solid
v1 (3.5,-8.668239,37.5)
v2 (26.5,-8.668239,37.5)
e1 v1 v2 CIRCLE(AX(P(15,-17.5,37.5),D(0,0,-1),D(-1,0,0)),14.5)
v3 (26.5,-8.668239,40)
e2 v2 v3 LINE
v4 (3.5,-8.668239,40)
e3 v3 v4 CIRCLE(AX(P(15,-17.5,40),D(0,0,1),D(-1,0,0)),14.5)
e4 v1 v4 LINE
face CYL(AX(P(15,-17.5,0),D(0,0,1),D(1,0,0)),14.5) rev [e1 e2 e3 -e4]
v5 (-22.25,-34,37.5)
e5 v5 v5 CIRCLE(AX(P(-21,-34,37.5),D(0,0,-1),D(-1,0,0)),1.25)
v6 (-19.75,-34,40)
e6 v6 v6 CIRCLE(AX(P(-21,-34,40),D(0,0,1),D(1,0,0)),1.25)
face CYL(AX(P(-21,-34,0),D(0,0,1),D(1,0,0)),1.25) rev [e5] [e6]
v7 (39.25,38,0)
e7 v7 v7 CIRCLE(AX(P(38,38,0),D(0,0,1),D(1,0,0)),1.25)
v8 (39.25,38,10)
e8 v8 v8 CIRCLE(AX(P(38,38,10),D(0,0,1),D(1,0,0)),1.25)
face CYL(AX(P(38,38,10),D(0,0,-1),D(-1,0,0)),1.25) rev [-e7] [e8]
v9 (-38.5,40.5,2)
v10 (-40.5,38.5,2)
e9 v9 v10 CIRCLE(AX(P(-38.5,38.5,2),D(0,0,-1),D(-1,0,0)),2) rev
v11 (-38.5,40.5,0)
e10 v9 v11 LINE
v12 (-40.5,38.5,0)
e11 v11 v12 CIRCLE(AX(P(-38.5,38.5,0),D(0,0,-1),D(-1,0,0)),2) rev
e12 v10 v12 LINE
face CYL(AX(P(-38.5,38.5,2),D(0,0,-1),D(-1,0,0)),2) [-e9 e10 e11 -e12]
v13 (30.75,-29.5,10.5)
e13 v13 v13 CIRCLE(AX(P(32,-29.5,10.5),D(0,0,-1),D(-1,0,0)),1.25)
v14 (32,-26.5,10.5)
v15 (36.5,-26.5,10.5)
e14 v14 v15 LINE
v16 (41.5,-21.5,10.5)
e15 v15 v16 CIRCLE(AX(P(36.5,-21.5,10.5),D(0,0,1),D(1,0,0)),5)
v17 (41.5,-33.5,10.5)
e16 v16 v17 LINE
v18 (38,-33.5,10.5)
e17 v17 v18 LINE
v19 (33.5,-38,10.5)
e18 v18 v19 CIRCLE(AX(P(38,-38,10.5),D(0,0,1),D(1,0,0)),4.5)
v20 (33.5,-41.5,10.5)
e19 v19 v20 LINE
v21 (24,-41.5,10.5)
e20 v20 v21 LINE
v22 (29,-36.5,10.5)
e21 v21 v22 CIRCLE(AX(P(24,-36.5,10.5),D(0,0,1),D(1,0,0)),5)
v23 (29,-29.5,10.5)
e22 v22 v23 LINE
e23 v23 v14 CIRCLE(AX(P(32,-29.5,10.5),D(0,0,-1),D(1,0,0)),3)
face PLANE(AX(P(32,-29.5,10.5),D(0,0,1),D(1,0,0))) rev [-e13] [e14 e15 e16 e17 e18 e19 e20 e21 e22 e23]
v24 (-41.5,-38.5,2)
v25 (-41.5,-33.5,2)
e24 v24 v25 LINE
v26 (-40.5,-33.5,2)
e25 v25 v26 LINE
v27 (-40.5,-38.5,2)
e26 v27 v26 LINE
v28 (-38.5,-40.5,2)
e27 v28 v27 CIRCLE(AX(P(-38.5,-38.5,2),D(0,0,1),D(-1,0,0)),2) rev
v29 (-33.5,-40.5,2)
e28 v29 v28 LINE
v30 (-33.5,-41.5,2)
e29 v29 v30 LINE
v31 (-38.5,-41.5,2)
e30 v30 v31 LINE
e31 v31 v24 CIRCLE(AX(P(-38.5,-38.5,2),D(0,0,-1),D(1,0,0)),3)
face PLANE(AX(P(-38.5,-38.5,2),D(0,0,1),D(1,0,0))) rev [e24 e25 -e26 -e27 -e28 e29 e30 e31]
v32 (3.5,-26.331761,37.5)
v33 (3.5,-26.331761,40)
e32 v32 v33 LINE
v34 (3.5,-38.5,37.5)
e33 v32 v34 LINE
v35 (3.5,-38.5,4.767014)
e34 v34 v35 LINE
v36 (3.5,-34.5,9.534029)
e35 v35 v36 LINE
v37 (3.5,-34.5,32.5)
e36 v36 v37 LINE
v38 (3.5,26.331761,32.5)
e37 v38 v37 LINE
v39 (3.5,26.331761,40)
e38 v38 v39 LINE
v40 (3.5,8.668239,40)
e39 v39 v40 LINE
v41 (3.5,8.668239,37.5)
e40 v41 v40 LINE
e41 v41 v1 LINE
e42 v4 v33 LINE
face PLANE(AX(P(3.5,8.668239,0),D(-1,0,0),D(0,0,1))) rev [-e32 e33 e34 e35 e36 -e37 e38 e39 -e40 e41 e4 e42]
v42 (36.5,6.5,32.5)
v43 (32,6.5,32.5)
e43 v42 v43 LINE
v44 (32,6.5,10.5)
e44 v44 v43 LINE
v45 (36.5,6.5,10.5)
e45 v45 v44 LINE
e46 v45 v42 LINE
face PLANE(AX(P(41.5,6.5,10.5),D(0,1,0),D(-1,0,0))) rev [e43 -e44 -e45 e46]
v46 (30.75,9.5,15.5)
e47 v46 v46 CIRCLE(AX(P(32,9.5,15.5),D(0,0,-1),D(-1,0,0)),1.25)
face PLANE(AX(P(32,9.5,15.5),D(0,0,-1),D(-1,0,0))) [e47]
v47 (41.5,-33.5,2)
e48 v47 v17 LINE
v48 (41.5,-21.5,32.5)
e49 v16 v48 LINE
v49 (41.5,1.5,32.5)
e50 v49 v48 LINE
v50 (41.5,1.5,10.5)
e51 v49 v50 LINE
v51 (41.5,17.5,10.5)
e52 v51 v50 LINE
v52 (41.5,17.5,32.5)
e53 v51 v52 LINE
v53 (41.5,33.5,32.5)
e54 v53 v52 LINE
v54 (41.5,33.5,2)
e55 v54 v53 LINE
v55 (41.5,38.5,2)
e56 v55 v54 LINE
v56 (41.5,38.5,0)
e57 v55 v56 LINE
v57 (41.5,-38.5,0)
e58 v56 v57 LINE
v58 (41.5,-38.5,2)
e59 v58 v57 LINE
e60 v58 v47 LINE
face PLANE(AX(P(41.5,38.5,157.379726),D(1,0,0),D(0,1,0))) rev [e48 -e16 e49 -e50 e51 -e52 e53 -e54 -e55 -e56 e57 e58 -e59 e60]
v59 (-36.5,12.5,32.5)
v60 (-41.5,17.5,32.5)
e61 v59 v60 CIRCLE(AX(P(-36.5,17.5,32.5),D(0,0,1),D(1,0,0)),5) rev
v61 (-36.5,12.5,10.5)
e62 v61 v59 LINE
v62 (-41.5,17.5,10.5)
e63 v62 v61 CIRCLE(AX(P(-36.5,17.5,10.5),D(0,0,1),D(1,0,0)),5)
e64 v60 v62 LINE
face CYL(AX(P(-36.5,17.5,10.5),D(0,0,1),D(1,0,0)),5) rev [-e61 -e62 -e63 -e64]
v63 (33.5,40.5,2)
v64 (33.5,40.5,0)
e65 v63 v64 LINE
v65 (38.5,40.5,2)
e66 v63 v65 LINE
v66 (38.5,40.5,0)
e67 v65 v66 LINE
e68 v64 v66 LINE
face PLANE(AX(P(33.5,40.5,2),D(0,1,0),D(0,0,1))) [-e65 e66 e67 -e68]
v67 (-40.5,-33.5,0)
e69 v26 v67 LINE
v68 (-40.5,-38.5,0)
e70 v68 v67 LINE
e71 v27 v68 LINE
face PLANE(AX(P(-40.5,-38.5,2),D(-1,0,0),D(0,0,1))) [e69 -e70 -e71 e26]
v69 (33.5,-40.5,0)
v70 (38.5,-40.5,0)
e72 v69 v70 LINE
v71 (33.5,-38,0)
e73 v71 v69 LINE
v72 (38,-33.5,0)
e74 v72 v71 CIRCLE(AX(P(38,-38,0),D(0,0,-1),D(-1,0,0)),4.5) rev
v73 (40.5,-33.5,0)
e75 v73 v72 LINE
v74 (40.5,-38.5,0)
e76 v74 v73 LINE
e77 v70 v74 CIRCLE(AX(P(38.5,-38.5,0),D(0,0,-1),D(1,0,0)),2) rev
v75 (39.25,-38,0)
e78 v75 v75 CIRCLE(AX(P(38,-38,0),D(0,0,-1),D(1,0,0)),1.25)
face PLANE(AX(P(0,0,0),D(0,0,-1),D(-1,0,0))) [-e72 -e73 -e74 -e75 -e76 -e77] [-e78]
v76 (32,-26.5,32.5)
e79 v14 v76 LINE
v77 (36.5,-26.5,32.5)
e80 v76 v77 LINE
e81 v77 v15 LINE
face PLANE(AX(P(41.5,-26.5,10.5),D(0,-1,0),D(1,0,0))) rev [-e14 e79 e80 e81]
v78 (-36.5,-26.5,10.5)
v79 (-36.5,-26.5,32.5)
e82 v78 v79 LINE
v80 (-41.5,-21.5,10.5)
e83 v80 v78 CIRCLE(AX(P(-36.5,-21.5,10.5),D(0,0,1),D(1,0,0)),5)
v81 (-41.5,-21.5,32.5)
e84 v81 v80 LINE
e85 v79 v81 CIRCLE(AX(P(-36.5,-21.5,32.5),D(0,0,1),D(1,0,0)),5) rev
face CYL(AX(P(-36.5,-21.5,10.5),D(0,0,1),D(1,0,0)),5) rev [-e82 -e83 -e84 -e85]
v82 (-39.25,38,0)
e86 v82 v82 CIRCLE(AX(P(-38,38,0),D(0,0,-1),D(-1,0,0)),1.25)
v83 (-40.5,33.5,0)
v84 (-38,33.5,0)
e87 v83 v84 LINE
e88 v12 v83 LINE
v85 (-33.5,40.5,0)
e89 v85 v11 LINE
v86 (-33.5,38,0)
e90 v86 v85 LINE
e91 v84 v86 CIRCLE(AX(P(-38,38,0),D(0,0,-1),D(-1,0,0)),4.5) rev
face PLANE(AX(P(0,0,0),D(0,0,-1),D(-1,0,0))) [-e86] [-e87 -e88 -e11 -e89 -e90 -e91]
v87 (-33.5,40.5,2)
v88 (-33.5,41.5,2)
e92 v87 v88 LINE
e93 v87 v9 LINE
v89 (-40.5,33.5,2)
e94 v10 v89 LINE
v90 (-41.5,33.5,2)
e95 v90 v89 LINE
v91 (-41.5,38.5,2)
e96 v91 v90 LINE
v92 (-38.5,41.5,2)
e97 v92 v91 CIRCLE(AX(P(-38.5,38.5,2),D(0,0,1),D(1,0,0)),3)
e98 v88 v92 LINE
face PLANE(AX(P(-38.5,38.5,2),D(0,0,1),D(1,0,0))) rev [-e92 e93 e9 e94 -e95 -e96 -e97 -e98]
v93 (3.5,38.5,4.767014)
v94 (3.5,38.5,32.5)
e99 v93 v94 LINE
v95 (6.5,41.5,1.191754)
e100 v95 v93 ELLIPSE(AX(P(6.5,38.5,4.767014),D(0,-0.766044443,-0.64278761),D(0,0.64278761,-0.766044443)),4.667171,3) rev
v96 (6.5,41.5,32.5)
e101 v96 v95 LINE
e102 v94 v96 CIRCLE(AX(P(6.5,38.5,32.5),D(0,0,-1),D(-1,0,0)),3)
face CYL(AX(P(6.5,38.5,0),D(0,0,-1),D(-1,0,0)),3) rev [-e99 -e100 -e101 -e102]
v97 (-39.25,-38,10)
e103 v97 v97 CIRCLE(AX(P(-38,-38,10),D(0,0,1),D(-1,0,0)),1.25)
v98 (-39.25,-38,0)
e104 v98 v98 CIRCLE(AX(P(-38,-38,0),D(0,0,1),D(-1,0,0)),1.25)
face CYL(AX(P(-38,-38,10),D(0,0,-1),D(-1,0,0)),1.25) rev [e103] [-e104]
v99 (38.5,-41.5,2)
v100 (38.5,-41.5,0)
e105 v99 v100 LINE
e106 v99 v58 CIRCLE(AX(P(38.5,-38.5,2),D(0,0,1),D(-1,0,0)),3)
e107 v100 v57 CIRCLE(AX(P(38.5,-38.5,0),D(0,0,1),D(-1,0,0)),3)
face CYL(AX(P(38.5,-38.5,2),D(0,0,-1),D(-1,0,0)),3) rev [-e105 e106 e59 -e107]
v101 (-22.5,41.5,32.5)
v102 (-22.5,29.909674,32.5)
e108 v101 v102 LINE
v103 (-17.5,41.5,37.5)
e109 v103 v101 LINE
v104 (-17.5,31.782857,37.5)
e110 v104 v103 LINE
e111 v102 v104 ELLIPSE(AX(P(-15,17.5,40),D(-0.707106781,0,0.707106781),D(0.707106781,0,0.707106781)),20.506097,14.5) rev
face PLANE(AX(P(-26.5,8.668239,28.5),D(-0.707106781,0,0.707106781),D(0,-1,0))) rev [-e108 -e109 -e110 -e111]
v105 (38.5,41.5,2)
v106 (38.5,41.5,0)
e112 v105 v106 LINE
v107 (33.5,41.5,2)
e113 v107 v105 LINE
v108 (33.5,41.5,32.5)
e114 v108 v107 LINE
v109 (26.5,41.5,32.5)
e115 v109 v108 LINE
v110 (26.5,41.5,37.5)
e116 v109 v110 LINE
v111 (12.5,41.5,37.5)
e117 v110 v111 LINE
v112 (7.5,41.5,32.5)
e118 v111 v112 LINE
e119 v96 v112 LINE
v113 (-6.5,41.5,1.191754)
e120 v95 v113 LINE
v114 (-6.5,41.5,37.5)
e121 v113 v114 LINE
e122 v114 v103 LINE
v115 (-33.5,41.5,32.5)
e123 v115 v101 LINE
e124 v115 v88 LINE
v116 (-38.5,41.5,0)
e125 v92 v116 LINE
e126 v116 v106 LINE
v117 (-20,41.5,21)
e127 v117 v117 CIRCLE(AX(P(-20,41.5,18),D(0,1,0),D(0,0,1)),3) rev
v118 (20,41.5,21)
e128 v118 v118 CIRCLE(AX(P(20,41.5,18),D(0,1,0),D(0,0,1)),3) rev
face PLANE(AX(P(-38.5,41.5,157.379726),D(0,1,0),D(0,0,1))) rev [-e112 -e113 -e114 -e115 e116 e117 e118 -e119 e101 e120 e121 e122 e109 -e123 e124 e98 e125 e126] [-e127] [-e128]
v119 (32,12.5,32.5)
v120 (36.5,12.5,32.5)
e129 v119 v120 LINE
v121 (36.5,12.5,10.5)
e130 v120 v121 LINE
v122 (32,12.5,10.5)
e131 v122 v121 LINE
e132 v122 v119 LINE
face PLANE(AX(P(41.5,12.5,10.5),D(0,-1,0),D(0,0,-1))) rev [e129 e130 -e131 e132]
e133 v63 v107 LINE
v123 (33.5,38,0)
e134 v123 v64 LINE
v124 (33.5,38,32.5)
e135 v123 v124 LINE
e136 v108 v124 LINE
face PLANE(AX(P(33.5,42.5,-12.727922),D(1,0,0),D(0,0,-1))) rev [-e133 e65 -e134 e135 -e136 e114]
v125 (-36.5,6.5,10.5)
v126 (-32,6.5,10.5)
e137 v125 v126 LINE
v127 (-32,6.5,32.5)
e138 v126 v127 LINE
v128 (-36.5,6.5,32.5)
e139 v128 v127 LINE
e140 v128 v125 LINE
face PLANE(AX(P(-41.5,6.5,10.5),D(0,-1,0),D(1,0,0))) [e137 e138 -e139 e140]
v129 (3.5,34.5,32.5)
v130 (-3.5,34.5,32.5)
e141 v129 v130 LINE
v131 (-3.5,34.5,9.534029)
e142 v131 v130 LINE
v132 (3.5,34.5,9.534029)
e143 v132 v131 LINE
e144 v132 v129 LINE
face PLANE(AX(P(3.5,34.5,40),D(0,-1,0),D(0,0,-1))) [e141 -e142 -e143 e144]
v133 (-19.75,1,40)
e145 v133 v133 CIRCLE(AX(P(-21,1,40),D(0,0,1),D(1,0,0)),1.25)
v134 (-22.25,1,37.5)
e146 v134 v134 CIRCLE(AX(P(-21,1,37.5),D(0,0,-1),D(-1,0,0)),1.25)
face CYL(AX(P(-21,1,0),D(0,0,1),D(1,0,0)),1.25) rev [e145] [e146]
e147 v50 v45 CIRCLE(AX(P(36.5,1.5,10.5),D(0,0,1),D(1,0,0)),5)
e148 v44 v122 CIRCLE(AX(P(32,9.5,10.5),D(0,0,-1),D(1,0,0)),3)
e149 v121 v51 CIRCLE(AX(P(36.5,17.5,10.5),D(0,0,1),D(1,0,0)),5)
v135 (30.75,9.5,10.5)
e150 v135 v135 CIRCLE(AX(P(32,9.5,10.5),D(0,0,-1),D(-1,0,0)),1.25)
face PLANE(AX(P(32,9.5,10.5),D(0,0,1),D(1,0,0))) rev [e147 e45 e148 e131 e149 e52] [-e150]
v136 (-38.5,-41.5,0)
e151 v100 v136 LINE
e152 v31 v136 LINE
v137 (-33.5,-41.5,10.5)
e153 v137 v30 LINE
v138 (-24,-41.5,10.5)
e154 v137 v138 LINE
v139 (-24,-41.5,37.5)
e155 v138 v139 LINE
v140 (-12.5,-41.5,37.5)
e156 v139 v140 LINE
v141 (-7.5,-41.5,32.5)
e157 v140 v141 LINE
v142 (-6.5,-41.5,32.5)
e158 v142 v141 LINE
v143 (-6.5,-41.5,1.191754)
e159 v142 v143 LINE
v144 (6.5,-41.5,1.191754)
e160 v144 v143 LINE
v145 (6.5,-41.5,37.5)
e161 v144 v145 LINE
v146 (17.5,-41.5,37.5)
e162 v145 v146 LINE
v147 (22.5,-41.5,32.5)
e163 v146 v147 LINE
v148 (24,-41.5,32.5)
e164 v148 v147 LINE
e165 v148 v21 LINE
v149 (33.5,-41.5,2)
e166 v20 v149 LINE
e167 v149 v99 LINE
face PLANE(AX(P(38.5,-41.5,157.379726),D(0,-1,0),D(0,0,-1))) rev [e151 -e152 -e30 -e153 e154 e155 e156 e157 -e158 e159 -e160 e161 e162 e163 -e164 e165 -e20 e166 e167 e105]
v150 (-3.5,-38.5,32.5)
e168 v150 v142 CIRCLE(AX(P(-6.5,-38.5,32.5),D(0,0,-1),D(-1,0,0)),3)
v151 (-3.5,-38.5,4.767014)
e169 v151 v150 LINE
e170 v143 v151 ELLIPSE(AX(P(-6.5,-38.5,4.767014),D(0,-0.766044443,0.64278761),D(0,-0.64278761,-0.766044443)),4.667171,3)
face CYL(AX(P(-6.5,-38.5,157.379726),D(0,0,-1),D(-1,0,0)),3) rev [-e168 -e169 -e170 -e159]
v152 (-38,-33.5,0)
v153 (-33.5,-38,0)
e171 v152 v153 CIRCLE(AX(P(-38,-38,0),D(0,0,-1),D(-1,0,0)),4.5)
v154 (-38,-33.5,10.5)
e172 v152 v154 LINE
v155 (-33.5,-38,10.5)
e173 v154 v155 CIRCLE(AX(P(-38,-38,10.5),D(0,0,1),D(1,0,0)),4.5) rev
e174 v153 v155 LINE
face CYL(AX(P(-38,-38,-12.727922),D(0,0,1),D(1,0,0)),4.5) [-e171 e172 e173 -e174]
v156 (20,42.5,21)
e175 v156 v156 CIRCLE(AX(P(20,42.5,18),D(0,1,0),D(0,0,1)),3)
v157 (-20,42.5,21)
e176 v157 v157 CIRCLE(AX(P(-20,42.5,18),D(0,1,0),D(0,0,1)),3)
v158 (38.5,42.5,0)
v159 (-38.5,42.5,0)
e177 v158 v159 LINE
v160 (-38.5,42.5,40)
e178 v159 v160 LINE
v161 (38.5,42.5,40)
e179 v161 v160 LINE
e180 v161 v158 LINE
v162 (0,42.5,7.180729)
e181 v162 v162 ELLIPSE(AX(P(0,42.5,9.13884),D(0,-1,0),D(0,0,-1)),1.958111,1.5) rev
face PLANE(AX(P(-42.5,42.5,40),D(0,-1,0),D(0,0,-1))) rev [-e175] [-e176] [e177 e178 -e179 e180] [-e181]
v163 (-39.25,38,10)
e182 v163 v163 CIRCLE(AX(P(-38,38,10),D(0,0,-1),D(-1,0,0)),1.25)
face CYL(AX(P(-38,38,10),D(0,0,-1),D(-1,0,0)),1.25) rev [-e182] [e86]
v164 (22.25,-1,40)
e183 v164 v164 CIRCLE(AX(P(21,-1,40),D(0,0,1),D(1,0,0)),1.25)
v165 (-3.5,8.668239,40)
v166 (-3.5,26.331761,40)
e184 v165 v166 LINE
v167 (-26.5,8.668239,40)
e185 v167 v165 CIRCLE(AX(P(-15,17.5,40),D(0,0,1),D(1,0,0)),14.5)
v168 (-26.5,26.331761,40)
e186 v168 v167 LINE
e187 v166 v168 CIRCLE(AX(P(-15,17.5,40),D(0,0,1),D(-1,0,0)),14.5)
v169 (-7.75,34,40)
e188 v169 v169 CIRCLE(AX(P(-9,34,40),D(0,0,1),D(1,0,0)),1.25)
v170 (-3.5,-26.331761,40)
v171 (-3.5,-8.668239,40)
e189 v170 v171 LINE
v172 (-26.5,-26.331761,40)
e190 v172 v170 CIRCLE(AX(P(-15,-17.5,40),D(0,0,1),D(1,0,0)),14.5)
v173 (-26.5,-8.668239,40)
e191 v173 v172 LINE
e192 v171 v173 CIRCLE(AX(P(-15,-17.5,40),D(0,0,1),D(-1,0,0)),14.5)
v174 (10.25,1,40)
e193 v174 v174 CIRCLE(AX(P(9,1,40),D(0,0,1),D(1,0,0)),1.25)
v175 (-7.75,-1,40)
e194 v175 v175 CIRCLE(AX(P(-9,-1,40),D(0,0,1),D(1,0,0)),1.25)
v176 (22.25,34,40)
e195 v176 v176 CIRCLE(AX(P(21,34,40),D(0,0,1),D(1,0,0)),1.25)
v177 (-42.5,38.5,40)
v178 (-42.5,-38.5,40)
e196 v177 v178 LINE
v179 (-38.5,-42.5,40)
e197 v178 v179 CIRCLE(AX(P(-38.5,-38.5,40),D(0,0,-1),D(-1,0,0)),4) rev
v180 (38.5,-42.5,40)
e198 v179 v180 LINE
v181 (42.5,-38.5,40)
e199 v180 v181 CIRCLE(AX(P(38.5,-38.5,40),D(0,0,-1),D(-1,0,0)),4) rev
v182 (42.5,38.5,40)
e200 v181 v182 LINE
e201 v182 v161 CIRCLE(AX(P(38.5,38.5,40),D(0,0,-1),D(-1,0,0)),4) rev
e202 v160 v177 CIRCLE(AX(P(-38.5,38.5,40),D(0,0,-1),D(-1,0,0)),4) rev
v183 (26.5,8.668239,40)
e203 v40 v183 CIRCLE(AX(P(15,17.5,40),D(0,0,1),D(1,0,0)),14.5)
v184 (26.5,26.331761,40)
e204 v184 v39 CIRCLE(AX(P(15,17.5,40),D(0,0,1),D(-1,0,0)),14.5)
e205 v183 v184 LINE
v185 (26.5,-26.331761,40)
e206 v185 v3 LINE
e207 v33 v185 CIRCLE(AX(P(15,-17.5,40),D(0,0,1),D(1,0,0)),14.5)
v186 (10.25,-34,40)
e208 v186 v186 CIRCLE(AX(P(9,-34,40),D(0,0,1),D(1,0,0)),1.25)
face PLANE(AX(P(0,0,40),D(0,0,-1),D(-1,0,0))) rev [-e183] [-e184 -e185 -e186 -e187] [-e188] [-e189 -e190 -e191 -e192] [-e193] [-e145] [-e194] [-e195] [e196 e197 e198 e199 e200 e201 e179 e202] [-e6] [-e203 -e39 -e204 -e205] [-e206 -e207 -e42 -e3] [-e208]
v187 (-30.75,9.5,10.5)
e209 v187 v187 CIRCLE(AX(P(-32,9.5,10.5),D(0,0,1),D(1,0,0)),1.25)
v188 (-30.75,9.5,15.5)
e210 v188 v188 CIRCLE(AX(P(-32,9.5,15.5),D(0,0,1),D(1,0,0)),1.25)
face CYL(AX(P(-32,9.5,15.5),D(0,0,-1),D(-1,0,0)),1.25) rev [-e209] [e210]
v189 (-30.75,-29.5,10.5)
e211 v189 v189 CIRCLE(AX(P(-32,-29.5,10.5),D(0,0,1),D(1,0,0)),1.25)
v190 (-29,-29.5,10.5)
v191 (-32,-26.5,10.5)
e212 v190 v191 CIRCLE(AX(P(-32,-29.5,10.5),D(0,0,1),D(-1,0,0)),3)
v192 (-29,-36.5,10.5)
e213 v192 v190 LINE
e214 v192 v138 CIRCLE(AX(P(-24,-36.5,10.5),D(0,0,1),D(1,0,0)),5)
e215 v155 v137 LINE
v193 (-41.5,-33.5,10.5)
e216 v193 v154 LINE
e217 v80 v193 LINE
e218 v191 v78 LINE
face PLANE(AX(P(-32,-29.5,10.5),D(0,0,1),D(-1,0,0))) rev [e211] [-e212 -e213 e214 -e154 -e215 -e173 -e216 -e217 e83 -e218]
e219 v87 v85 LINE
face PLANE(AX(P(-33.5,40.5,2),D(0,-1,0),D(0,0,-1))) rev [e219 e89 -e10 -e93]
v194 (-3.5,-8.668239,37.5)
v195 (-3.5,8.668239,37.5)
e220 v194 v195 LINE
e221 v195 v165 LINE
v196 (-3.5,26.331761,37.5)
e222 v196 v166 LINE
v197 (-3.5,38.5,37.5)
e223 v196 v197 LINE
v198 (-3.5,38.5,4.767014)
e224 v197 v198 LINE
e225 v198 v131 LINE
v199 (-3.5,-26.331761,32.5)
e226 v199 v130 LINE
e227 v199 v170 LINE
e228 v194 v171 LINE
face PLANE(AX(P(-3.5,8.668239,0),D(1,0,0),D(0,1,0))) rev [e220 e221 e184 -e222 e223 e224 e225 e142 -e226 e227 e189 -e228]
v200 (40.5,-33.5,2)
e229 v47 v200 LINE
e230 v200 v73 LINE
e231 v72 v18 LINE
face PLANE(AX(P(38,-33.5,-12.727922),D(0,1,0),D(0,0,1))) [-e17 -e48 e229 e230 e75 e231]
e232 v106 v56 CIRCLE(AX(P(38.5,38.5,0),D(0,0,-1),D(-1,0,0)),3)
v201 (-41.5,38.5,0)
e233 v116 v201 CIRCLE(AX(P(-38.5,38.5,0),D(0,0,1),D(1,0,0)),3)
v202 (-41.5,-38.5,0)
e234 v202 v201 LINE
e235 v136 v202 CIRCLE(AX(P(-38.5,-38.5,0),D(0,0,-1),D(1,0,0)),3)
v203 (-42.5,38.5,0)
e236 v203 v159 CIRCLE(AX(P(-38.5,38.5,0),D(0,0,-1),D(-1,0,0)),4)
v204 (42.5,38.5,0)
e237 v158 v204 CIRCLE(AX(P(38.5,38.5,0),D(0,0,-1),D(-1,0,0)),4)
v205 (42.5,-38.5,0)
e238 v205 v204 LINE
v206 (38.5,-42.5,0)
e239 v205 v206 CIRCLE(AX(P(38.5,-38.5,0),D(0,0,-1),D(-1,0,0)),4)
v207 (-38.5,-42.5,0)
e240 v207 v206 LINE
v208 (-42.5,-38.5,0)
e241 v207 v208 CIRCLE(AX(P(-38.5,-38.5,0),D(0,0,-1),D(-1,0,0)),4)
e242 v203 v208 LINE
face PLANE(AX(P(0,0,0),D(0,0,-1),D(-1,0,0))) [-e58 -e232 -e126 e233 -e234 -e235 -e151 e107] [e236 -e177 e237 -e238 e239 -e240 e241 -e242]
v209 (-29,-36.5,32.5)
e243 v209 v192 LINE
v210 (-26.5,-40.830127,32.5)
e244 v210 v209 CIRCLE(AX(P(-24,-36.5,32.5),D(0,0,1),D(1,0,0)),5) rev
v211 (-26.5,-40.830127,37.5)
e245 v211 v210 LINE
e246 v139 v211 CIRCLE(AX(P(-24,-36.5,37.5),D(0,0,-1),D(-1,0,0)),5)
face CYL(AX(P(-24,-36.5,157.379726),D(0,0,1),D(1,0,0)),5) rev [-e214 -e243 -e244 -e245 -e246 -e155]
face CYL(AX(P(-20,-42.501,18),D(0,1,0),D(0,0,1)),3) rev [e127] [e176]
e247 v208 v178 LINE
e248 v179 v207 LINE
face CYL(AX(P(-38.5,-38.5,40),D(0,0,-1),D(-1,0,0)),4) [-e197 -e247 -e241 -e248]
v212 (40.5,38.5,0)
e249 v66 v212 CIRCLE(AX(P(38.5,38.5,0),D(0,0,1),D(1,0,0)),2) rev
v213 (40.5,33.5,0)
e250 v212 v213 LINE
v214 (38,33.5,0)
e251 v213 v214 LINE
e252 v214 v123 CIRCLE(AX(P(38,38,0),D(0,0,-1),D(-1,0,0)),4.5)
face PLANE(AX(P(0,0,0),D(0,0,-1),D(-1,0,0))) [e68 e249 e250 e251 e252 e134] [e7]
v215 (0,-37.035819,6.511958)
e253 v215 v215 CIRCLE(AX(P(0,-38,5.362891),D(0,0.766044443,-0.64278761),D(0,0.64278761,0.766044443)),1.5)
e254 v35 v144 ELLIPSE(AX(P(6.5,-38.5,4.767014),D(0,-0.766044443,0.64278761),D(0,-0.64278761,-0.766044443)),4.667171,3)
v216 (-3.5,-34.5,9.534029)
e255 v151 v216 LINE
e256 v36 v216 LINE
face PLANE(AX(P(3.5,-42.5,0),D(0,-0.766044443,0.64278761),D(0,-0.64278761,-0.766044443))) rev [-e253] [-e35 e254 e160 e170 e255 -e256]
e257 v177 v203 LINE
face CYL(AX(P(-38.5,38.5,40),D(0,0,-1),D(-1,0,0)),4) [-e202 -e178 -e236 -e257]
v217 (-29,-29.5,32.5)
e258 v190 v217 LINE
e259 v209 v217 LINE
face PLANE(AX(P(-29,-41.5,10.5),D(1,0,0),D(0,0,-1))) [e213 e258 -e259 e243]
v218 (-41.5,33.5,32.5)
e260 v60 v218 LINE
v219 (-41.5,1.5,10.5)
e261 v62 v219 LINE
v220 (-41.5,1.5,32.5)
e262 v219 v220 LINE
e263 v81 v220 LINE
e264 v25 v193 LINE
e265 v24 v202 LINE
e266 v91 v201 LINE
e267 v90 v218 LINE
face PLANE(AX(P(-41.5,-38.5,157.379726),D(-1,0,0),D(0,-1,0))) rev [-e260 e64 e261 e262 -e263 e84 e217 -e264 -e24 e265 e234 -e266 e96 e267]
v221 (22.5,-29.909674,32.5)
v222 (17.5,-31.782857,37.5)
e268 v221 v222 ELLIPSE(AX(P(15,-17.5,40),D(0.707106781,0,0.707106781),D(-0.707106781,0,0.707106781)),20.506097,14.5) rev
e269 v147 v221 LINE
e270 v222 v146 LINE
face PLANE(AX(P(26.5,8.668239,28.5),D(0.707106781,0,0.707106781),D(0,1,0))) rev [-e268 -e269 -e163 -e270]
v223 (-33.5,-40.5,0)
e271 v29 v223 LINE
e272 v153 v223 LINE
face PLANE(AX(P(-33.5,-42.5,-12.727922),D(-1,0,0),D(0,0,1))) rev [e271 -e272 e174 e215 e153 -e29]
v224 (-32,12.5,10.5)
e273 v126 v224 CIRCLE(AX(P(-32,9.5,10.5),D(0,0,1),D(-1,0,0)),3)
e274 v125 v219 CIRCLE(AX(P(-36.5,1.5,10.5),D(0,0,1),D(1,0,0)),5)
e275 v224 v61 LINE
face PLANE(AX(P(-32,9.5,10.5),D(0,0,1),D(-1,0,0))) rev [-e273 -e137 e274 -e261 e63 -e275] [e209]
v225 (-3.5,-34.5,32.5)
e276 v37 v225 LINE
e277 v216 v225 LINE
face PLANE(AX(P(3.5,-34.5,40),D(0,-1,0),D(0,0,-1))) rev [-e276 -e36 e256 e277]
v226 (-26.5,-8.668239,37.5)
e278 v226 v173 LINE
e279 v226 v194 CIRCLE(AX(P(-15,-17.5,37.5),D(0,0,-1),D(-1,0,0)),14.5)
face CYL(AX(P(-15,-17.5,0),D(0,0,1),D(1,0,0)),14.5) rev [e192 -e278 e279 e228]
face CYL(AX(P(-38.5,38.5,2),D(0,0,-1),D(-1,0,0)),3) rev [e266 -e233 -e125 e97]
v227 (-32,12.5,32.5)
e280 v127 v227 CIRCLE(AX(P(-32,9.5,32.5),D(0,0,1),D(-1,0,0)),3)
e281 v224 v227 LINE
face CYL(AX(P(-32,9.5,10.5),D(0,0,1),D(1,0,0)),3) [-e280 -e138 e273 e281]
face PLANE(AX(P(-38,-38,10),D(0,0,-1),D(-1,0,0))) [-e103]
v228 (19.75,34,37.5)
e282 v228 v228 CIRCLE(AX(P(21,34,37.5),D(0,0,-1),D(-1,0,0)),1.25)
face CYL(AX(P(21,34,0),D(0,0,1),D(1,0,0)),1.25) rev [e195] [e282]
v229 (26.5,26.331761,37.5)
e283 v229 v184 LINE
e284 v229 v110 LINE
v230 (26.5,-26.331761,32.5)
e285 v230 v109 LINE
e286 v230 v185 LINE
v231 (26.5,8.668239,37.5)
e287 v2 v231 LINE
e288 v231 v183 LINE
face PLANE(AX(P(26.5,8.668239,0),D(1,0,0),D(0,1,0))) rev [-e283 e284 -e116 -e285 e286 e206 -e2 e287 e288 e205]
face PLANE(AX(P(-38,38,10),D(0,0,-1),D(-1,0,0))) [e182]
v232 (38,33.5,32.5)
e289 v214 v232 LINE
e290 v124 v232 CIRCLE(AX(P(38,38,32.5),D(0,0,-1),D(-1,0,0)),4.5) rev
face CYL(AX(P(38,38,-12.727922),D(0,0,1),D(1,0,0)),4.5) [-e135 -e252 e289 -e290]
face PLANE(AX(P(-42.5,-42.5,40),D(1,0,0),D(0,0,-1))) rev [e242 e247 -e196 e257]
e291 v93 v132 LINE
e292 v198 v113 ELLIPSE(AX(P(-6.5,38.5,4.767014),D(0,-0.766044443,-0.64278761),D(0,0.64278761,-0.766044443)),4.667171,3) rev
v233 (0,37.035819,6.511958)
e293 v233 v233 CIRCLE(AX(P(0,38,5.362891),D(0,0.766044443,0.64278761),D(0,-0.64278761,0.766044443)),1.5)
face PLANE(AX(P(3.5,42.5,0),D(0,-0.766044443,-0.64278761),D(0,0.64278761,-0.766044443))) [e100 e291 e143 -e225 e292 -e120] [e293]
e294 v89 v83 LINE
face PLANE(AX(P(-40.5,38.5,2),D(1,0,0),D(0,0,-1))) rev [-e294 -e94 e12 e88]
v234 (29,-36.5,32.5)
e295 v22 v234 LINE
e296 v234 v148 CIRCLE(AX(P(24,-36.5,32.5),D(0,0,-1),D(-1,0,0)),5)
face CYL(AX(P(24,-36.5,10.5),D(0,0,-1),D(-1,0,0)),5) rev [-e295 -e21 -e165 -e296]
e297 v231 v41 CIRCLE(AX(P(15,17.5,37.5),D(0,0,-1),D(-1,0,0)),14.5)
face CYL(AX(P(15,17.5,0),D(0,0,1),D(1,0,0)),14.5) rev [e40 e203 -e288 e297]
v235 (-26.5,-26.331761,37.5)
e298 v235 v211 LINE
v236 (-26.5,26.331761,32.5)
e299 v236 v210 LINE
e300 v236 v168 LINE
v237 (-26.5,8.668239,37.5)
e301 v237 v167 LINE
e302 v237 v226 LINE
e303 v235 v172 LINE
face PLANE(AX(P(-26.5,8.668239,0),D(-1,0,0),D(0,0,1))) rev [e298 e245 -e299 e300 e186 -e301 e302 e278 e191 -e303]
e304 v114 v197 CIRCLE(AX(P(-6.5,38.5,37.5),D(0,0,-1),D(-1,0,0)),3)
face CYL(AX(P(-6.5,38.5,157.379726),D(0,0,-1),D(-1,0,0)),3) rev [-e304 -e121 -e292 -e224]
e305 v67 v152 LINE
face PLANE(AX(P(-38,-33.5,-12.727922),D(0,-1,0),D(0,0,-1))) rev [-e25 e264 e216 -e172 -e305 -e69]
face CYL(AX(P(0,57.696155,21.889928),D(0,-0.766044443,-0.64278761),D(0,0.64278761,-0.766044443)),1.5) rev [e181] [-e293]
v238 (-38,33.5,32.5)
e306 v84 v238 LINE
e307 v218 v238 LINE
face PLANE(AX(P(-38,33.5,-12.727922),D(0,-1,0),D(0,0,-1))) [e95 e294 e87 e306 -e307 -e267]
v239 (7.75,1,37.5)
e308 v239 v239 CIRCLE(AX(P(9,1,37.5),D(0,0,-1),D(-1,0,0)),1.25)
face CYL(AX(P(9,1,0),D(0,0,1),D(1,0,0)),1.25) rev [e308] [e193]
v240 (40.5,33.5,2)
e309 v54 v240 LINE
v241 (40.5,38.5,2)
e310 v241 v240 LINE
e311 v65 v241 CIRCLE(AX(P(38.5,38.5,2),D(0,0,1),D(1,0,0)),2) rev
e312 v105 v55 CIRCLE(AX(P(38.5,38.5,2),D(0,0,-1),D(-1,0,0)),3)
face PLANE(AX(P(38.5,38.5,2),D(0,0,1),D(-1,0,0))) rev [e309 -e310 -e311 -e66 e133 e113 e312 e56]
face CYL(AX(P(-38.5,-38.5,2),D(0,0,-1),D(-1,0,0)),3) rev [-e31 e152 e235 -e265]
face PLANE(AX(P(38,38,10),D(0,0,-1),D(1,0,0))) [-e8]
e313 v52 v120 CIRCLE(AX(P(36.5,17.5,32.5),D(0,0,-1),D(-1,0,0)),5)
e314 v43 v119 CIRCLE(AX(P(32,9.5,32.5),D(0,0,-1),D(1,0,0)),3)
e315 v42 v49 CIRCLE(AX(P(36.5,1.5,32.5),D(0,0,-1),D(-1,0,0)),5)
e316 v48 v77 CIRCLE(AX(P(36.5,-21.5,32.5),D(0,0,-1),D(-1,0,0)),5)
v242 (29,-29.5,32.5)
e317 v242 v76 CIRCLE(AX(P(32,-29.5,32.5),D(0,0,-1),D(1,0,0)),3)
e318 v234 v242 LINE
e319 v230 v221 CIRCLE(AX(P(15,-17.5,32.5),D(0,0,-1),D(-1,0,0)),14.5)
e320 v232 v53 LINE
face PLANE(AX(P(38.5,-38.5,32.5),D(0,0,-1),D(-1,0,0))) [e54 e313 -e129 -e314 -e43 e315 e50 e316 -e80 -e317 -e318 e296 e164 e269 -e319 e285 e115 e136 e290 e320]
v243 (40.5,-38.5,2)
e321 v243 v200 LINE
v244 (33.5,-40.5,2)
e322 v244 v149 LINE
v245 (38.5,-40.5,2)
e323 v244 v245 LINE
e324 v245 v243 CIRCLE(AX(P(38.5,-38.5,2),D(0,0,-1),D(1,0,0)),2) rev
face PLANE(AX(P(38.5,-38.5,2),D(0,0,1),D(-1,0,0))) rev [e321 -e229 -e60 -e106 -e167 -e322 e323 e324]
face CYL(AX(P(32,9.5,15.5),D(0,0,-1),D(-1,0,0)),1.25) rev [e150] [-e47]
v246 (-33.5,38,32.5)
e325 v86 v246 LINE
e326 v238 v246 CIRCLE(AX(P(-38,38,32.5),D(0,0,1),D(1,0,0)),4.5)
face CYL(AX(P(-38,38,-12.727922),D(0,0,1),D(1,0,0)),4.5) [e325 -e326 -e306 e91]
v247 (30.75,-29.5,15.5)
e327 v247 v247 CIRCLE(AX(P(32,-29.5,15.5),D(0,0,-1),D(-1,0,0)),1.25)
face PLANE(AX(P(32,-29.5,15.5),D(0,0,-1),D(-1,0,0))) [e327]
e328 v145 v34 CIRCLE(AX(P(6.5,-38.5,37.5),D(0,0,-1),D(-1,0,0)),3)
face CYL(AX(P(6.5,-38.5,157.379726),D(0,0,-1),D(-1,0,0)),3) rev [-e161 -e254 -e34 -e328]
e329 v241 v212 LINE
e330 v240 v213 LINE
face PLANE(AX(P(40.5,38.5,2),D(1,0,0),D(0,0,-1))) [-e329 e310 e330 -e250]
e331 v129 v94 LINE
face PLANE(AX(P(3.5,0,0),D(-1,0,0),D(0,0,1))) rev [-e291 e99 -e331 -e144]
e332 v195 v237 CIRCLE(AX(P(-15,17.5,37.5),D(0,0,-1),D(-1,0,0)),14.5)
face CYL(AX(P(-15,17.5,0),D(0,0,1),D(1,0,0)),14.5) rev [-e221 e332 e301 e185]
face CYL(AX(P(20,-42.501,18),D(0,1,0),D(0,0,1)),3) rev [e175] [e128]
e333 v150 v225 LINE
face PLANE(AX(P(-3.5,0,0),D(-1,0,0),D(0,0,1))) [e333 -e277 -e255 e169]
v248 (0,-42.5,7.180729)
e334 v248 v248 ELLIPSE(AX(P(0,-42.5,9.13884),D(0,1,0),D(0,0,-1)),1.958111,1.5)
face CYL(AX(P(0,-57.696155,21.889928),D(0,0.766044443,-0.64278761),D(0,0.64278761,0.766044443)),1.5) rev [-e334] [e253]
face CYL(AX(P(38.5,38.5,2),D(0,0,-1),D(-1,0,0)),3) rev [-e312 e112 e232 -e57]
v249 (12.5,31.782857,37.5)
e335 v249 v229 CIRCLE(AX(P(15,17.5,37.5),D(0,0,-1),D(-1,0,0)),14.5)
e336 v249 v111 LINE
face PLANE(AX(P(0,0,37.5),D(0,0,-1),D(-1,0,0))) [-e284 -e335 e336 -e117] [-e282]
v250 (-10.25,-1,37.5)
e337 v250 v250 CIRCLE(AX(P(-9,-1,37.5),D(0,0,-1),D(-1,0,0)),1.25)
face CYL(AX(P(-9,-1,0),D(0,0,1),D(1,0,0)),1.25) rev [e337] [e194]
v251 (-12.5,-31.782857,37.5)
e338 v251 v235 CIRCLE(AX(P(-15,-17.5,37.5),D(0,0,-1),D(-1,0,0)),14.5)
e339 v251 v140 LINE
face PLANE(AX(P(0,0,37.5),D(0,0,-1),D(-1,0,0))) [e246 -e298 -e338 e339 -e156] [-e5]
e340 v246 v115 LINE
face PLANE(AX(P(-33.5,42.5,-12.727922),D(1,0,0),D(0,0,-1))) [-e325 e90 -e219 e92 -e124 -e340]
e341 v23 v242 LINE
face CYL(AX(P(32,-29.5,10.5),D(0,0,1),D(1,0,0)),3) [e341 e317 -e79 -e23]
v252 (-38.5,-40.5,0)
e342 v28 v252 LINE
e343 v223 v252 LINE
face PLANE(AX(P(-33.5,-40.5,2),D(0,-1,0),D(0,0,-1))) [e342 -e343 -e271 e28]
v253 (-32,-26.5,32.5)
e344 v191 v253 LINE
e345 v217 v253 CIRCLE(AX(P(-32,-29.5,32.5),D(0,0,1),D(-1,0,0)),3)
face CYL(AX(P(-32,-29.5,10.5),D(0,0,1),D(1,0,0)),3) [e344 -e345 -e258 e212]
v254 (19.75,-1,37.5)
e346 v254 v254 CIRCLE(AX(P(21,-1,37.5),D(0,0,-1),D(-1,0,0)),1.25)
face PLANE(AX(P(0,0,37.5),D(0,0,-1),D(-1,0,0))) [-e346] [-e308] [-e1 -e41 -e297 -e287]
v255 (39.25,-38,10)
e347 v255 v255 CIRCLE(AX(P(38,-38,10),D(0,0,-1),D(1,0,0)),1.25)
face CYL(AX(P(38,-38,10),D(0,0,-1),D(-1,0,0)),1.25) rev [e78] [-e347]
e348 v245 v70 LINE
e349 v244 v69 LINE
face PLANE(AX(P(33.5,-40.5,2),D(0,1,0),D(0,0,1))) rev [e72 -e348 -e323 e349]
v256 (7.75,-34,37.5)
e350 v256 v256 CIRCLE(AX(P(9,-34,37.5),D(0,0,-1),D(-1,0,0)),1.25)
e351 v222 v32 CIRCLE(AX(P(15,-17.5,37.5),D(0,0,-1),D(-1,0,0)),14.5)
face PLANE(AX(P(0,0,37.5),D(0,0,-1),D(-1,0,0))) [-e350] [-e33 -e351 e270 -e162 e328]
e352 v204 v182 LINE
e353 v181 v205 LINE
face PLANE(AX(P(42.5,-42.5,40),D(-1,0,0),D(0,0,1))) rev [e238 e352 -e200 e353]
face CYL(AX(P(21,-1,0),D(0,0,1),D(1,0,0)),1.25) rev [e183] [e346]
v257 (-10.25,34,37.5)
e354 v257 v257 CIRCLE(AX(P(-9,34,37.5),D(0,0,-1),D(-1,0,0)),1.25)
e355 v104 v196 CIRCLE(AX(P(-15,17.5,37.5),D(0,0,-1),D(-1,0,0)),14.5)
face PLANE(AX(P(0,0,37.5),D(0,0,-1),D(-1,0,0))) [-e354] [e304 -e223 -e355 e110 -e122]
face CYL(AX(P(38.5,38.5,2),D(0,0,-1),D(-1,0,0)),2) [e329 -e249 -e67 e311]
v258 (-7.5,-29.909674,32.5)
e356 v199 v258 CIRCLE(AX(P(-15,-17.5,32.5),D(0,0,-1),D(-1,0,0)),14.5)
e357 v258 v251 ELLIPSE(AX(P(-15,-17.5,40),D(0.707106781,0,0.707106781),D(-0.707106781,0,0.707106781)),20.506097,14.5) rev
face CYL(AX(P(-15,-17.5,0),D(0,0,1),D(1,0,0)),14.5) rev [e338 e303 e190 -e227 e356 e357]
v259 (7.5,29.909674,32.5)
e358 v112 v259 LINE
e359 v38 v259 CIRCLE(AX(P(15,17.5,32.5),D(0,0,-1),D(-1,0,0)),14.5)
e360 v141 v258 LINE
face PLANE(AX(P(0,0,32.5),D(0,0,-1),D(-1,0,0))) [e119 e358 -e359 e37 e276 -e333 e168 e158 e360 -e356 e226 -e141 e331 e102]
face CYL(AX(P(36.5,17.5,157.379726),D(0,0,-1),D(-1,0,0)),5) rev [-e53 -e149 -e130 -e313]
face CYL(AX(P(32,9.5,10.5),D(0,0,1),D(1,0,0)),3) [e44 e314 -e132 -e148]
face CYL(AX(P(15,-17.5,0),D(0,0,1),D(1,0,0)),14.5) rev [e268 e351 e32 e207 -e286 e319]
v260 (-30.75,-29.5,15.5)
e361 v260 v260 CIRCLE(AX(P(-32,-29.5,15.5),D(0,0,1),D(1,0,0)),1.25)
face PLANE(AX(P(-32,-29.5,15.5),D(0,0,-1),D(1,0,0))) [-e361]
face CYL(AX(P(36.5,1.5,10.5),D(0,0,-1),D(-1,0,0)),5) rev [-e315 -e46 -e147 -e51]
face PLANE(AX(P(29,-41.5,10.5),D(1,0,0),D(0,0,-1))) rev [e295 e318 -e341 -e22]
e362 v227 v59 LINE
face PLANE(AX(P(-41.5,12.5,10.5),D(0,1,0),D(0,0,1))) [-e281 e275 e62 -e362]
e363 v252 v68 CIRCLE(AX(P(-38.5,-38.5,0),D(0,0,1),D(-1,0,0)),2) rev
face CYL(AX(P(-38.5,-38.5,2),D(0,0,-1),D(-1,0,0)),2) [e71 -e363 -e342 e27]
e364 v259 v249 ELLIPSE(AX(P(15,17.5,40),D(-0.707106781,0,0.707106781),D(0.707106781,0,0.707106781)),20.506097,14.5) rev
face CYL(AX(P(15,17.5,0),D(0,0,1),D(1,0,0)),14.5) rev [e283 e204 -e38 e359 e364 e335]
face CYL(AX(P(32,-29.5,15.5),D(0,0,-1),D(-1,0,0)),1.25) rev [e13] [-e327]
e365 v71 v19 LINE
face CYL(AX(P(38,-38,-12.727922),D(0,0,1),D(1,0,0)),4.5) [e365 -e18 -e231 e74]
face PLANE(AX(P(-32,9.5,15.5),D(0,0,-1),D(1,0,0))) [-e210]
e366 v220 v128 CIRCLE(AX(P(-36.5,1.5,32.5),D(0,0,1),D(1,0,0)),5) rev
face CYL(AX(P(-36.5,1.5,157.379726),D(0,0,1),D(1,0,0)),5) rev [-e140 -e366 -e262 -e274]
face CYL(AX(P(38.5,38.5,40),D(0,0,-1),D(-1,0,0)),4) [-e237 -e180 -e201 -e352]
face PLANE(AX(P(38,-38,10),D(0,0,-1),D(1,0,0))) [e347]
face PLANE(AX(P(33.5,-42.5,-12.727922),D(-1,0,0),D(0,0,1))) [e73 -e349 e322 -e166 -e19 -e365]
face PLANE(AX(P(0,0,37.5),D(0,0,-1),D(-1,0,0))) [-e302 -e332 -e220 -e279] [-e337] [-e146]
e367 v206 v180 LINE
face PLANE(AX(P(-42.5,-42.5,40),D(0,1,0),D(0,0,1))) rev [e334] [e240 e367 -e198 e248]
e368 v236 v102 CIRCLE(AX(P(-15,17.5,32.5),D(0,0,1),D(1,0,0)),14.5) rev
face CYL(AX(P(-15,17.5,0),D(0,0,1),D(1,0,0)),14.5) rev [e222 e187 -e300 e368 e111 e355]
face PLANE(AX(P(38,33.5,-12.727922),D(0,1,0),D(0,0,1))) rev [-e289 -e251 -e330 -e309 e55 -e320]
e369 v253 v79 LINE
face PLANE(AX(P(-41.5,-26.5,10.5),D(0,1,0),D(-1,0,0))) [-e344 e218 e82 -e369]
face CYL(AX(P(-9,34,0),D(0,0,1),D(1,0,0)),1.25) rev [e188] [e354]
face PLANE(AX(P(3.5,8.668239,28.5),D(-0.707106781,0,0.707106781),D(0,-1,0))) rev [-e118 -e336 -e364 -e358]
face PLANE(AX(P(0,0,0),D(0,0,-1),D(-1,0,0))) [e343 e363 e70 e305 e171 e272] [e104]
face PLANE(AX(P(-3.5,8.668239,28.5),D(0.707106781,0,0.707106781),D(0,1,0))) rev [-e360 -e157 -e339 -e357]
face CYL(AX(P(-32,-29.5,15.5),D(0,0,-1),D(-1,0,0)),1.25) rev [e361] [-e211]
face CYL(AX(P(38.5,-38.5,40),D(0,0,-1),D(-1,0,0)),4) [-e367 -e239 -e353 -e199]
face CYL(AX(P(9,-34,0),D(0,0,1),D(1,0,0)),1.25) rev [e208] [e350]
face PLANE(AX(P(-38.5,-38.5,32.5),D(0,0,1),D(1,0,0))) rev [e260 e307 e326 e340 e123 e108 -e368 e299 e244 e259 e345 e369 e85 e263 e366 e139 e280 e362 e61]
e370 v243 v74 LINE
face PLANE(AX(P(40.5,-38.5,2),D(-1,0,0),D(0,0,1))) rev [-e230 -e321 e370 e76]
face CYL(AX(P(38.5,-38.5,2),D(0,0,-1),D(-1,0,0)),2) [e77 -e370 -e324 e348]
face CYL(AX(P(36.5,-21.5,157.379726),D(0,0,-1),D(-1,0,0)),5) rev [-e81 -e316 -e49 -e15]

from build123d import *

# Parameters (mm, degrees)
SKETCH1_W               = 85
SKETCH1_H               = 85
BOSS_EXTRUDE1_DEPTH     = 40
CUT_EXTRUDE4_DEPTH      = 37.5
FILLET4_R               = 4
CUT_EXTRUDE1_DEPTH      = 73.197645391
SKETCH3_R               = 1.25
CUT_EXTRUDE6_DEPTH      = 73.197645391
LPATTERN1_COUNT         = 2
LPATTERN1_PITCH         = 35
LPATTERN1_COUNT_DIR2    = 2
LPATTERN1_PITCH_DIR2    = 30
BOSS_EXTRUDE7_START     = 5
SKETCH19_W              = 7
SKETCH19_H              = 83
BOSS_EXTRUDE7_DEPTH     = 5
CHAMFER1_START          = 32.5
CHAMFER1_DEPTH          = 5
CHAMFER1_START_2        = -41.5
CHAMFER1_2_DEPTH        = 83
CHAMFER1_3_DEPTH        = 67.831760866
CHAMFER1_START_3        = -26.331760866
CHAMFER1_4_DEPTH        = 67.831760866
BOSS_EXTRUDE8_START     = 22
BOSS_EXTRUDE8_DEPTH     = 22
SKETCH25_R              = 1.25
CUT_EXTRUDE10_DEPTH     = 5
BOSS_EXTRUDE6_DEPTH     = 40
SKETCH15_R              = 1.25
CUT_EXTRUDE7_DEPTH      = 10
CUT_EXTRUDE_THIN1_DEPTH = 2
MIRROR4_COPY_1_DEPTH    = 40
MIRROR4_COPY_2_SKETCH_R = 1.25
MIRROR4_COPY_2_DEPTH    = 10
MIRROR4_COPY_3_DEPTH    = 2
CUT_EXTRUDE8_REACH      = 105.108
SKETCH16_R              = 3
BOSS_EXTRUDE9_DEPTH     = 3.5
SKETCH27_R              = 1.5
CUT_EXTRUDE11_DEPTH     = 83.415732912
FILLET6_R               = 5
FILLET7_R               = 3


with BuildPart() as part:
    # Sketch1 → Boss-Extrude1 (new body)
    with BuildSketch(Plane.XY):
        Rectangle(SKETCH1_W, SKETCH1_H)
    extrude(amount=BOSS_EXTRUDE1_DEPTH)

    # Sketch8 → Cut-Extrude4 (cut)
    with BuildSketch(Plane(origin=(0, 0, 0), x_dir=(-1, 0, 0), z_dir=(0, 0, -1))):
        with BuildLine():
            Line((41.5, -38.5), (41.5, 38.5))
            ThreePointArc((41.5, 38.5), (40.621320344, 40.621320344), (38.5, 41.5))
            Line((38.5, 41.5), (-38.5, 41.5))
            ThreePointArc((-38.5, 41.5), (-40.621320344, 40.621320344), (-41.5, 38.5))
            Line((-41.5, 38.5), (-41.5, -38.5))
            ThreePointArc((-41.5, -38.5), (-40.621320344, -40.621320344), (-38.5, -41.5))
            Line((-38.5, -41.5), (38.5, -41.5))
            ThreePointArc((38.5, -41.5), (40.621320344, -40.621320344), (41.5, -38.5))
        make_face()
    extrude(amount=-CUT_EXTRUDE4_DEPTH, mode=Mode.SUBTRACT)

    # Fillet4
    fillet4_edges = [part.edges().sort_by_distance(p)[0] for p in [
        (42.5, -42.5, 20),
        (-42.5, -42.5, 20),
        (-42.5, 42.5, 20),
        (42.5, 42.5, 20),
    ]]
    fillet(fillet4_edges, radius=FILLET4_R)

    # Sketch2 → Cut-Extrude1 (cut, through all)
    with BuildSketch(Plane.XY.offset(40)):
        with BuildLine():
            Line((-26.5, 8.668239134), (-26.5, 26.331760866))
            ThreePointArc((-26.5, 26.331760866), (-15, 32), (-3.5, 26.331760866))
            Line((-3.5, 26.331760866), (-3.5, 8.668239134))
            ThreePointArc((-3.5, 8.668239134), (-15, 3), (-26.5, 8.668239134))
        make_face()
    cut_extrude1 = extrude(amount=-CUT_EXTRUDE1_DEPTH, mode=Mode.SUBTRACT)

    # Sketch3 → Cut-Extrude6 (cut, through all)
    with BuildSketch(Plane.XY.offset(40)):
        with Locations((-9, 34)):
            Circle(SKETCH3_R)
        with Locations((-21, 1)):
            Circle(SKETCH3_R)
    cut_extrude6 = extrude(amount=-CUT_EXTRUDE6_DEPTH, mode=Mode.SUBTRACT)

    # LPattern1: Cut-Extrude1, Cut-Extrude6 2 × 2
    with Locations(*[(j * LPATTERN1_PITCH_DIR2, -i * LPATTERN1_PITCH, 0) for i in range(LPATTERN1_COUNT) for j in range(LPATTERN1_COUNT_DIR2) if (i, j) != (0, 0)]):
        add(cut_extrude1, mode=Mode.SUBTRACT)
        add(cut_extrude6, mode=Mode.SUBTRACT)

    # Sketch19 → Boss-Extrude7 (add)
    with BuildSketch(Plane(origin=(0, 0, 37.5), x_dir=(-1, 0, 0), z_dir=(0, 0, -1)).offset(BOSS_EXTRUDE7_START)):
        with BuildLine():
            Line((-38.5, 41.5), (-26.5, 41.5))
            Line((-26.5, 41.5), (-26.5, -41.5))
            Line((-26.5, -41.5), (-38.5, -41.5))
            ThreePointArc((-38.5, -41.5), (-40.621320344, -40.621320344), (-41.5, -38.5))
            Line((-41.5, -38.5), (-41.5, 38.5))
            ThreePointArc((-41.5, 38.5), (-40.621320344, 40.621320344), (-38.5, 41.5))
        make_face()
        Rectangle(SKETCH19_W, SKETCH19_H)
        with BuildLine():
            Line((38.5, 41.5), (26.5, 41.5))
            Line((26.5, 41.5), (26.5, -41.5))
            Line((26.5, -41.5), (38.5, -41.5))
            ThreePointArc((38.5, -41.5), (40.621320344, -40.621320344), (41.5, -38.5))
            Line((41.5, -38.5), (41.5, 38.5))
            ThreePointArc((41.5, 38.5), (40.621320344, 40.621320344), (38.5, 41.5))
        make_face()
    extrude(amount=-BOSS_EXTRUDE7_DEPTH)

    # Chamfer1: read off the stored shape, not the designer's step
    # Chamfer1 outline → Chamfer1 (add)
    with BuildSketch(Plane.XY.offset(CHAMFER1_START)):
        with BuildLine():
            ThreePointArc((-26.5, 26.331760866), (-15, 32), (-3.5, 26.331760866))
            Line((-3.5, 26.331760866), (-3.5, 41.5))
            Line((-3.5, 41.5), (-26.5, 41.5))
            Line((-26.5, 41.5), (-26.5, 26.331760866))
        make_face()
        with BuildLine():
            Line((26.5, 41.5), (3.5, 41.5))
            Line((3.5, 41.5), (3.5, 26.331760866))
            ThreePointArc((3.5, 26.331760866), (15, 32), (26.5, 26.331760866))
            Line((26.5, 26.331760866), (26.5, 41.5))
        make_face()
        with BuildLine():
            Line((-3.5, -41.5), (-3.5, -26.331760866))
            ThreePointArc((-3.5, -26.331760866), (-15, -32), (-26.5, -26.331760866))
            Line((-26.5, -26.331760866), (-26.5, -41.5))
            Line((-26.5, -41.5), (-3.5, -41.5))
        make_face()
        with BuildLine():
            Line((3.5, -26.331760866), (3.5, -41.5))
            Line((3.5, -41.5), (26.5, -41.5))
            Line((26.5, -41.5), (26.5, -26.331760866))
            ThreePointArc((26.5, -26.331760866), (15, -32), (3.5, -26.331760866))
        make_face()
    extrude(amount=CHAMFER1_DEPTH)

    # Chamfer1 2 outline → Chamfer1 2 (cut)
    with BuildSketch(Plane(origin=(0, 0, 0), x_dir=(1, 0, 0), z_dir=(0, 1, 0)).offset(CHAMFER1_START_2)):
        Polygon((-17.5, -37.5), (-12.5, -37.5), (-7.5, -32.5), (-22.5, -32.5), align=None)
        Polygon((22.5, -32.5), (7.5, -32.5), (12.5, -37.5), (17.5, -37.5), align=None)
    extrude(amount=CHAMFER1_2_DEPTH, mode=Mode.SUBTRACT)

    # Chamfer1 3 outline → Chamfer1 3 (cut)
    with BuildSketch(Plane(origin=(0, 0, 0), x_dir=(1, 0, 0), z_dir=(0, 1, 0)).offset(CHAMFER1_START_2)):
        Polygon((7.5, -32.5), (3.5, -32.5), (3.5, -37.5), (12.5, -37.5), align=None)
        Polygon((-26.5, -37.5), (-17.5, -37.5), (-22.5, -32.5), (-26.5, -32.5), align=None)
    extrude(amount=CHAMFER1_3_DEPTH, mode=Mode.SUBTRACT)

    # Chamfer1 4 outline → Chamfer1 4 (cut)
    with BuildSketch(Plane(origin=(0, 0, 0), x_dir=(1, 0, 0), z_dir=(0, 1, 0)).offset(CHAMFER1_START_3)):
        Polygon((-7.5, -32.5), (-12.5, -37.5), (-3.5, -37.5), (-3.5, -32.5), align=None)
        Polygon((26.5, -32.5), (22.5, -32.5), (17.5, -37.5), (26.5, -37.5), align=None)
    extrude(amount=CHAMFER1_4_DEPTH, mode=Mode.SUBTRACT)

    # Sketch23 → Boss-Extrude8 (add)
    with BuildSketch(Plane(origin=(0, 0, 32.5), x_dir=(-1, 0, 0), z_dir=(0, 0, -1)).offset(BOSS_EXTRUDE8_START)):
        with BuildLine():
            Line((-38.5, -41.5), (-29, -41.5))
            Line((-29, -41.5), (-29, -29.5))
            ThreePointArc((-29, -29.5), (-29.878679656, -27.378679656), (-32, -26.5))
            Line((-32, -26.5), (-41.5, -26.5))
            Line((-41.5, -26.5), (-41.5, -38.5))
            ThreePointArc((-41.5, -38.5), (-40.621320344, -40.621320344), (-38.5, -41.5))
        make_face()
        with BuildLine():
            Line((-41.5, 12.5), (-32, 12.5))
            ThreePointArc((-32, 12.5), (-29, 9.5), (-32, 6.5))
            Line((-32, 6.5), (-41.5, 6.5))
            Line((-41.5, 6.5), (-41.5, 12.5))
        make_face()
    boss_extrude8 = extrude(amount=-BOSS_EXTRUDE8_DEPTH)

    # Sketch25 → Cut-Extrude10 (cut)
    with BuildSketch(Plane(origin=(0, 0, 10.5), x_dir=(-1, 0, 0), z_dir=(0, 0, -1))):
        with Locations((-32, -29.5)):
            Circle(SKETCH25_R)
        with Locations((-32, 9.5)):
            Circle(SKETCH25_R)
    cut_extrude10 = extrude(amount=-CUT_EXTRUDE10_DEPTH, mode=Mode.SUBTRACT)

    # Mirror5: Boss-Extrude8, Cut-Extrude10 across plane
    add(boss_extrude8.mirror(Plane(origin=(0, 0, 0), x_dir=(0, 0, 1), z_dir=(1, 0, 0))))
    add(cut_extrude10.mirror(Plane(origin=(0, 0, 0), x_dir=(0, 0, 1), z_dir=(1, 0, 0))), mode=Mode.SUBTRACT)

    # Sketch14 → Boss-Extrude6 (add)
    with BuildSketch(Plane.XY.offset(40)):
        with BuildLine():
            Line((-38, 33.5), (-42.5, 33.5))
            Line((-42.5, 33.5), (-42.5, 38))
            ThreePointArc((-42.5, 38), (-41.181980515, 41.181980515), (-38, 42.5))
            Line((-38, 42.5), (-33.5, 42.5))
            Line((-33.5, 42.5), (-33.5, 38))
            ThreePointArc((-33.5, 38), (-34.818019485, 34.818019485), (-38, 33.5))
        make_face()
    boss_extrude6 = extrude(amount=-BOSS_EXTRUDE6_DEPTH)

    # Sketch15 → Cut-Extrude7 (cut)
    with BuildSketch(Plane(origin=(0, 0, 0), x_dir=(-1, 0, 0), z_dir=(0, 0, -1))):
        with Locations((38, 38)):
            Circle(SKETCH15_R)
    cut_extrude7 = extrude(amount=-CUT_EXTRUDE7_DEPTH, mode=Mode.SUBTRACT)

    # Sketch28 → Cut-Extrude-Thin1 (cut)
    with BuildSketch(Plane(origin=(0, 0, 0), x_dir=(-1, 0, 0), z_dir=(0, 0, -1))):
        with BuildLine():
            Line((33.5, 41.5), (38.5, 41.5))
            ThreePointArc((38.5, 41.5), (40.621320344, 40.621320344), (41.5, 38.5))
            Line((41.5, 38.5), (41.5, 33.5))
            Line((41.5, 33.5), (40.5, 33.5))
            Line((40.5, 33.5), (40.5, 38.5))
            ThreePointArc((40.5, 38.5), (39.914213562, 39.914213562), (38.5, 40.5))
            Line((38.5, 40.5), (33.5, 40.5))
            Line((33.5, 40.5), (33.5, 41.5))
        make_face()
    cut_extrude_thin1 = extrude(amount=-CUT_EXTRUDE_THIN1_DEPTH, mode=Mode.SUBTRACT)

    # Mirror3: Boss-Extrude6, Cut-Extrude7, Cut-Extrude-Thin1 across plane
    add(boss_extrude6.mirror(Plane(origin=(0, 0, 0), x_dir=(0, 0, 1), z_dir=(1, 0, 0))))
    add(cut_extrude7.mirror(Plane(origin=(0, 0, 0), x_dir=(0, 0, 1), z_dir=(1, 0, 0))), mode=Mode.SUBTRACT)
    add(cut_extrude_thin1.mirror(Plane(origin=(0, 0, 0), x_dir=(0, 0, 1), z_dir=(1, 0, 0))), mode=Mode.SUBTRACT)

    # Mirror4: Boss-Extrude6, Cut-Extrude7, Cut-Extrude-Thin1 across plane
    add(boss_extrude6.mirror(Plane.ZX))
    add(cut_extrude7.mirror(Plane.ZX), mode=Mode.SUBTRACT)
    add(cut_extrude_thin1.mirror(Plane.ZX), mode=Mode.SUBTRACT)

    # Mirror4 copy 1 sketch → Mirror4 copy 1 (add)
    with BuildSketch(Plane(origin=(0, 0, 40), x_dir=(-1, 0, 0), z_dir=(0, 0, 1))):
        with BuildLine():
            Line((-38, 33.5), (-42.5, 33.5))
            Line((-42.5, 33.5), (-42.5, 38))
            ThreePointArc((-42.5, 38), (-41.181980515, 41.181980515), (-38, 42.5))
            Line((-38, 42.5), (-33.5, 42.5))
            Line((-33.5, 42.5), (-33.5, 38))
            ThreePointArc((-33.5, 38), (-34.818019485, 34.818019485), (-38, 33.5))
        make_face()
    extrude(amount=-MIRROR4_COPY_1_DEPTH)

    # Mirror4 copy 2 sketch → Mirror4 copy 2 (cut)
    with BuildSketch(Plane(origin=(0, 0, 0), x_dir=(1, 0, 0), z_dir=(0, 0, -1))):
        with Locations((38, 38)):
            Circle(MIRROR4_COPY_2_SKETCH_R)
    extrude(amount=-MIRROR4_COPY_2_DEPTH, mode=Mode.SUBTRACT)

    # Mirror4 copy 3 sketch → Mirror4 copy 3 (cut)
    with BuildSketch(Plane(origin=(0, 0, 0), x_dir=(1, 0, 0), z_dir=(0, 0, -1))):
        with BuildLine():
            Line((33.5, 41.5), (38.5, 41.5))
            ThreePointArc((38.5, 41.5), (40.621320344, 40.621320344), (41.5, 38.5))
            Line((41.5, 38.5), (41.5, 33.5))
            Line((41.5, 33.5), (40.5, 33.5))
            Line((40.5, 33.5), (40.5, 38.5))
            ThreePointArc((40.5, 38.5), (39.914213562, 39.914213562), (38.5, 40.5))
            Line((38.5, 40.5), (33.5, 40.5))
            Line((33.5, 40.5), (33.5, 41.5))
        make_face()
    extrude(amount=-MIRROR4_COPY_3_DEPTH, mode=Mode.SUBTRACT)

    # Sketch16 → Cut-Extrude8 (cut, up to next)
    with BuildSketch(Plane(origin=(0, 42.5, 0), x_dir=(1, 0, 0), z_dir=(0, 1, 0)), mode=Mode.PRIVATE) as cut_extrude8_sk1:
        with Locations(Location((20, -18, 0), (0, 0, 270))):
            Circle(SKETCH16_R)
    cut_extrude8_tool1 = extrude(cut_extrude8_sk1.sketch, amount=-CUT_EXTRUDE8_REACH, mode=Mode.PRIVATE) & part.part
    # Sketch16 → Cut-Extrude8 (cut, up to next)
    with BuildSketch(Plane(origin=(0, 42.5, 0), x_dir=(1, 0, 0), z_dir=(0, 1, 0)), mode=Mode.PRIVATE) as cut_extrude8_sk2:
        with Locations(Location((-20, -18, 0), (0, 0, 270))):
            Circle(SKETCH16_R)
    cut_extrude8_tool2 = extrude(cut_extrude8_sk2.sketch, amount=-CUT_EXTRUDE8_REACH, mode=Mode.PRIVATE) & part.part
    add(cut_extrude8_tool1.solids().sort_by_distance((20, 42.5, 18))[0], mode=Mode.SUBTRACT)
    add(cut_extrude8_tool2.solids().sort_by_distance((-20, 42.5, 18))[0], mode=Mode.SUBTRACT)

    # Sketch26 → Boss-Extrude9 (add, symmetric)
    with BuildSketch(Plane(origin=(0, 0, 0), x_dir=(0, 0, -1), z_dir=(1, 0, 0))):
        Polygon((-40, -42.5), (0, -42.5), (-9.534028741, -34.5), (-40, -34.5), align=None)
    boss_extrude9 = extrude(amount=BOSS_EXTRUDE9_DEPTH, both=True)

    # Sketch27 → Cut-Extrude11 (cut, through all)
    with BuildSketch(Plane(origin=(0, -24.940023775, 20.927164752), x_dir=(1, 0, 0), z_dir=(0, 0.7660444431189819, -0.6427876096865347))):
        with Locations(Location((0, 20.317716191, 0), (0, 0, 270))):
            Circle(SKETCH27_R)
    cut_extrude11 = extrude(amount=-CUT_EXTRUDE11_DEPTH, mode=Mode.SUBTRACT)

    # Mirror6: Boss-Extrude9, Cut-Extrude11 across plane
    add(boss_extrude9.mirror(Plane.ZX))
    add(cut_extrude11.mirror(Plane.ZX), mode=Mode.SUBTRACT)

    # Fillet6
    fillet6_edges = [part.edges().sort_by_distance(p)[0] for p in [
        (41.5, 12.5, 21.5),
        (41.5, 6.5, 21.5),
        (29, -41.5, 21.5),
        (41.5, -26.5, 21.5),
        (-41.5, 12.5, 21.5),
        (-41.5, 6.5, 21.5),
        (-29, -41.5, 21.5),
        (-41.5, -26.5, 21.5),
    ]]
    fillet(fillet6_edges, radius=FILLET6_R)

    # Fillet7
    fillet7_edges = [part.edges().sort_by_distance(p)[0] for p in [
        (3.5, -41.5, 19.345876796),
        (-3.5, 41.5, 19.345876796),
        (-3.5, -41.5, 16.845876796),
        (3.5, 41.5, 16.845876796),
    ]]
    fillet(fillet7_edges, radius=FILLET7_R)


solid = part.part
